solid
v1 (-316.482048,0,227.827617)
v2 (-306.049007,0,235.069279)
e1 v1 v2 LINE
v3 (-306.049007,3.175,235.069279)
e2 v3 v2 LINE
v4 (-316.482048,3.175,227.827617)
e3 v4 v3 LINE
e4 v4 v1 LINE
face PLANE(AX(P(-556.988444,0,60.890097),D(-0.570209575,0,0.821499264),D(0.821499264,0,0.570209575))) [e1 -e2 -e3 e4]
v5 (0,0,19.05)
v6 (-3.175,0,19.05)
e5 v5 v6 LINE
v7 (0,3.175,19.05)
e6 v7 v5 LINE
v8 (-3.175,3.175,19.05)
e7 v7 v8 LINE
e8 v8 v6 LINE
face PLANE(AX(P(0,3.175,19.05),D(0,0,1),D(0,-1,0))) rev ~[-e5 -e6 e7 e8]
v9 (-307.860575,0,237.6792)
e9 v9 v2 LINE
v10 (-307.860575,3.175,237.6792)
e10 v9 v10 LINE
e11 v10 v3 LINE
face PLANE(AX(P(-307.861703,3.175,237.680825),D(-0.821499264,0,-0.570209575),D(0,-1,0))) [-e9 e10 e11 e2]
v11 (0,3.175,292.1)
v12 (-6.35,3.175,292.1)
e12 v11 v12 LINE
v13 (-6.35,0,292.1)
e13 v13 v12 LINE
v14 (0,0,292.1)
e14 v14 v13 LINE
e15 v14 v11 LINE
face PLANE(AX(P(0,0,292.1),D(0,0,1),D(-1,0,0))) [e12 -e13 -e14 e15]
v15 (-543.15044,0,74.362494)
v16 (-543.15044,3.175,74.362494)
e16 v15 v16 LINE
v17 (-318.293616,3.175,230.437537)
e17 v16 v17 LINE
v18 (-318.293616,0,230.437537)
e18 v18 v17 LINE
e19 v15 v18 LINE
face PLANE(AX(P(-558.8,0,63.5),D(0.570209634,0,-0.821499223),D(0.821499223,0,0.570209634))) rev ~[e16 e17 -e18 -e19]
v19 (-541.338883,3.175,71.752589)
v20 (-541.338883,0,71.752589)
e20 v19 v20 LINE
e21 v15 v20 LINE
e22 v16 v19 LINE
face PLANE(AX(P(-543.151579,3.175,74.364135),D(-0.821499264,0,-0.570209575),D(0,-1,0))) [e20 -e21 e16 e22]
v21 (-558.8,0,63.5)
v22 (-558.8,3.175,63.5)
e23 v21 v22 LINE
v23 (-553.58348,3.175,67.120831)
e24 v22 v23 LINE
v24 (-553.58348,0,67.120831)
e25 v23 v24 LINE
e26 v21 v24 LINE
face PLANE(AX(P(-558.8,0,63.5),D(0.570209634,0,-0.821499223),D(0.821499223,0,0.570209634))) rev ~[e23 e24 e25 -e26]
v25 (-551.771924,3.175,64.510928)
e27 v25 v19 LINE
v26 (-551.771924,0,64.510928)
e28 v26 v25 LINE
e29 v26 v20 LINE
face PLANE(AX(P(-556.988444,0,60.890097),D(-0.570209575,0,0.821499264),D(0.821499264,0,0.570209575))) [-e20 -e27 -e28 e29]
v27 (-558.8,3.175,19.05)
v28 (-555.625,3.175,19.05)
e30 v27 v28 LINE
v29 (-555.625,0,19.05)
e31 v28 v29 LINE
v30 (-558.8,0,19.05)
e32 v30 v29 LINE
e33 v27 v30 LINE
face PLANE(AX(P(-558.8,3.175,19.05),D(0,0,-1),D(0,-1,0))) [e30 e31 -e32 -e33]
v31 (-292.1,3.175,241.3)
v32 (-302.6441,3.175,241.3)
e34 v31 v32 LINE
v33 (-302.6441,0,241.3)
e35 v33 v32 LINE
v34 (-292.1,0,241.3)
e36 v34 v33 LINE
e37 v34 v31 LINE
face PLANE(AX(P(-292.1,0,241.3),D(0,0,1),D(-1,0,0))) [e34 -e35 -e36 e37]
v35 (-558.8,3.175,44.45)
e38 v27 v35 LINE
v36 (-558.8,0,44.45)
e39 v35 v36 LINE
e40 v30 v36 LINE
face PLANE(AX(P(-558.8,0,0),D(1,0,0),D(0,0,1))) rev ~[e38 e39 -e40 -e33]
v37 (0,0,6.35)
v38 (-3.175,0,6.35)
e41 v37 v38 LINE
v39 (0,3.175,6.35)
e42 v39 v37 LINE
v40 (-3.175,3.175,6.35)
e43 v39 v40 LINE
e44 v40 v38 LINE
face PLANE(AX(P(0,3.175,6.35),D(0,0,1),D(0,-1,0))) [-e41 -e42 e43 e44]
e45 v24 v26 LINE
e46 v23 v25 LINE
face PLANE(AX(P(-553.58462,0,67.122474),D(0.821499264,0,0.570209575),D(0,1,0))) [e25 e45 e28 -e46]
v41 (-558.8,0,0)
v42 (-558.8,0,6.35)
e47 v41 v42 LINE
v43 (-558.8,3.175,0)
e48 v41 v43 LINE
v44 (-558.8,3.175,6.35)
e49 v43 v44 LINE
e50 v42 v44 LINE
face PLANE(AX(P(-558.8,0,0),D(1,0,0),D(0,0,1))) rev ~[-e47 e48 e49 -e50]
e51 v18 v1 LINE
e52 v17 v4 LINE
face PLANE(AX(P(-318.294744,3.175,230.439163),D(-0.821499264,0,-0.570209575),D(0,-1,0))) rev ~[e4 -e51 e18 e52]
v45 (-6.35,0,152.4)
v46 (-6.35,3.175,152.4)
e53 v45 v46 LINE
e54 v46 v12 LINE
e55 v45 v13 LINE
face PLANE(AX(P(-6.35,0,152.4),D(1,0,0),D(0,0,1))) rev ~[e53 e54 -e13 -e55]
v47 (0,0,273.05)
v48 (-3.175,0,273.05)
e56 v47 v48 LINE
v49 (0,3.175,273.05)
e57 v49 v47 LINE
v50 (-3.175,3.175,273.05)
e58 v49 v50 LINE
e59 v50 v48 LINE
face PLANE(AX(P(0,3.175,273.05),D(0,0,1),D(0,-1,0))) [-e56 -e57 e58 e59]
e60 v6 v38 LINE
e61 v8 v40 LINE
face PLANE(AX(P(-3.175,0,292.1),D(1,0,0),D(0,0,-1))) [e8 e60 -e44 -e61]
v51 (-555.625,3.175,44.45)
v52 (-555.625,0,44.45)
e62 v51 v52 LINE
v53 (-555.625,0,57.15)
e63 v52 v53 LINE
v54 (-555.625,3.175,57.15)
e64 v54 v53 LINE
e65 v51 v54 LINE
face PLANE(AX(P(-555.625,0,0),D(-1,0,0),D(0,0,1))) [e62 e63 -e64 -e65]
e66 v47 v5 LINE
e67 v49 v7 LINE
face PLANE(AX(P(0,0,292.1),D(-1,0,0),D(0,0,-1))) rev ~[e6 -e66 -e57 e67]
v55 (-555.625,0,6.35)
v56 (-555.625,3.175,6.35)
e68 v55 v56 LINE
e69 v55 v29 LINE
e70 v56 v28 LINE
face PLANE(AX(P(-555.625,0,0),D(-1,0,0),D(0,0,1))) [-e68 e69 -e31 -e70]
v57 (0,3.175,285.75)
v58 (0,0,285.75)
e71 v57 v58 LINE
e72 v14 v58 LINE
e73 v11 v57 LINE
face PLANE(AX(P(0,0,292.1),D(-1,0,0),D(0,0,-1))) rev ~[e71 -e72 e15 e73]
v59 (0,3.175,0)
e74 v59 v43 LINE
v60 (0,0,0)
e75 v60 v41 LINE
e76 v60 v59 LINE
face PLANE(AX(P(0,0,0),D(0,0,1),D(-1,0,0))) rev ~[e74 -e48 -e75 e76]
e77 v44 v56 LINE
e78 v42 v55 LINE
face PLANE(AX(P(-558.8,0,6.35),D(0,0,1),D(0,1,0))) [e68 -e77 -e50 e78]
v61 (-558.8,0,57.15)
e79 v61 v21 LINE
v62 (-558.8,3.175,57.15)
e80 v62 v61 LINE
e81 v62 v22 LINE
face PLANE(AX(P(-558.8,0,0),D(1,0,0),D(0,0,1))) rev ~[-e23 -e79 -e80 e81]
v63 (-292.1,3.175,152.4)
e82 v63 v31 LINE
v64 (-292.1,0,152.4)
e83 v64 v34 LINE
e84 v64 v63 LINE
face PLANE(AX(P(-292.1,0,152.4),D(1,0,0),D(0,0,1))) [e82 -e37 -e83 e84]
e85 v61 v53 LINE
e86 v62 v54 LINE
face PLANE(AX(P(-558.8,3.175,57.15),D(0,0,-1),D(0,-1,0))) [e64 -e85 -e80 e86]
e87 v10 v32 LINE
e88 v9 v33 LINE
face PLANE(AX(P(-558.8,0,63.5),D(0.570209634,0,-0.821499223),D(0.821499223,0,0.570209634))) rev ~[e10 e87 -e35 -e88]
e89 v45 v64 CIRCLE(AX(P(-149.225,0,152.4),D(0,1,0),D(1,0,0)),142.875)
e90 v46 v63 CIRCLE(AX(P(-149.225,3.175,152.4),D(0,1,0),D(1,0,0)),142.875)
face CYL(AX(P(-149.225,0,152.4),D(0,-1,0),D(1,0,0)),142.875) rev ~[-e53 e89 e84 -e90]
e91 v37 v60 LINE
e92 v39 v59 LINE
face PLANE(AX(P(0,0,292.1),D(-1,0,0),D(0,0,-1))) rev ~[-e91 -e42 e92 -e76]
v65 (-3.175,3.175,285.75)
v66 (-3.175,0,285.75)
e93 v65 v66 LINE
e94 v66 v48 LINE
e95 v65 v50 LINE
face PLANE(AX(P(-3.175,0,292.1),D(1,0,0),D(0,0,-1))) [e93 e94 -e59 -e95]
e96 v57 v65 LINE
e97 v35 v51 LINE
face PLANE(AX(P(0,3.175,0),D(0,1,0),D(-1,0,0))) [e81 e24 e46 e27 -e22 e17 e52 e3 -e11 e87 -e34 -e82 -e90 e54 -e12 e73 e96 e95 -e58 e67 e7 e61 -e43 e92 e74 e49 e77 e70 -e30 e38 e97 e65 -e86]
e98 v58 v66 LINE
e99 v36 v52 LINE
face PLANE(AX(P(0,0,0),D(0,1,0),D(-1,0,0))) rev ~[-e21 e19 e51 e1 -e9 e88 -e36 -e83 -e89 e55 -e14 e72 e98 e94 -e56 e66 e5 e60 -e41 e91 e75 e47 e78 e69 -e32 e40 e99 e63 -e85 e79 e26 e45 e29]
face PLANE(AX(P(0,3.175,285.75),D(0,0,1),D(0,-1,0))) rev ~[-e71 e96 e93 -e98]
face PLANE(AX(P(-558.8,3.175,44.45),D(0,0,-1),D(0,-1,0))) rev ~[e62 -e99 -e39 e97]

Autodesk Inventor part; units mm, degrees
ref_plane "YZ Plane" through (0, 0, 0) normal (1, 0, 0) x (0, 1, 0)
ref_plane "XZ Plane" through (0, 0, 0) normal (0, 1, 0) x (-1, 0, 0)
ref_plane "XY Plane" through (0, 0, 0) normal (0, 0, 1) x (1, 0, 0)
sketch "Sketch1" plane through (0, 0, 0) normal (0, 1, 0) x (-1, 0, 0)
  line L0 (0, 0) -> (558.8, 0)
  line L1 (0, 292.1) -> (0, 0)
  arc A0 (6.35, 152.4) -> (292.1, 152.4) centre (149.225, 152.4) ccw
  line L2 (292.1, 152.4) -> (292.1, 241.3)
  line L3 (6.35, 152.4) -> (6.35, 292.1)
  line L4 (0, 292.1) -> (6.35, 292.1)
  line L5 (292.1, 241.3) -> (302.6441, 241.3)
  line L6 (558.8, 0) -> (558.8, 63.5)
  line L7 (558.8, 63.5) -> (302.6441, 241.3)
  point P0 (297.372, 241.3)
  dimension "d0" = 558.8
  dimension "d3" = 285.75
  dimension "d10" = 292.1
  dimension "d14" = 63.5
  dimension "d33" = 241.3
  dimension "d34" = 139.7
  dimension "d37" = 6.35
extrude "Extrusion2" add sketch "Sketch1" along normal blind 3.175
sketch "Sketch2" plane through (-558.8, 0, 0) normal (-1, 0, 0) x (0, 0, 1)
  line L0 (0, 0) -> (63.5, 0) projected
  line L1 (63.5, 0) -> (63.5, 3.175) projected
  line L2 (0, 3.175) -> (63.5, 3.175) projected
  line L3 (0, 0) -> (0, 3.175) projected
  line L4 (6.35, 0) -> (6.35, 3.175)
  line L5 (19.05, 3.175) -> (19.05, 0)
  line L6 (57.15, 3.175) -> (57.15, 0)
  line L7 (44.45, 3.175) -> (44.45, 0)
  dimension "d15" = 6.35
  dimension "d16" = 12.7
  dimension "d17" = 12.7
  dimension "d18" = 6.35
extrude "Extrusion3" cut sketch "Sketch2" against normal blind 3.175 contours L4 L2 L5 L0 | L7 L2 L6 L0
sketch "Sketch3" plane through (-558.8, 0, 63.5) normal (-0.5702096, 0, 0.8214993) x (0.8214993, 0, 0.5702096)
  line L0 (0, 0) -> (311.8152, 0) projected
  line L1 (311.8152, 0) -> (311.8152, 3.175) projected
  line L2 (0, 3.175) -> (311.8152, 3.175) projected
  line L3 (0, 0) -> (0, 3.175) projected
  line L4 (6.35, 0) -> (6.35, 3.175)
  line L5 (19.05, 3.175) -> (19.05, 0)
  line L6 (305.4652, 3.175) -> (305.4652, 0)
  line L7 (292.7652, 3.175) -> (292.7652, 0)
  point P0 (422.8455, 0)
  dimension "d21" = 12.7
  dimension "d22" = 6.35
  dimension "d23" = 6.35
  dimension "d24" = 12.7
extrude "Extrusion4" cut sketch "Sketch3" against normal blind 3.175 contours L4 L2 L5 L0 | L7 L2 L6 L0
sketch "Sketch4" plane through (0, 0, 292.1) normal (1, 0, 0) x (0, 0, -1)
  line L0 (0, 0) -> (292.1, 0) projected
  line L1 (292.1, 0) -> (292.1, 3.175) projected
  line L2 (0, 3.175) -> (292.1, 3.175) projected
  line L3 (285.75, 3.175) -> (285.75, 0)
  line L4 (273.05, 3.175) -> (273.05, 0)
  line L5 (6.35, 3.175) -> (6.35, 0)
  line L6 (19.05, 3.175) -> (19.05, 0)
  dimension "d27" = 12.7
  dimension "d28" = 12.7
  dimension "d29" = 6.35
  dimension "d30" = 254
extrude "Extrusion5" cut sketch "Sketch4" against normal blind 3.175 contours L5 L2 L6 L0 | L4 L2 L3 L0
properties part number "Top" material "Polycarbonate, Clear"
